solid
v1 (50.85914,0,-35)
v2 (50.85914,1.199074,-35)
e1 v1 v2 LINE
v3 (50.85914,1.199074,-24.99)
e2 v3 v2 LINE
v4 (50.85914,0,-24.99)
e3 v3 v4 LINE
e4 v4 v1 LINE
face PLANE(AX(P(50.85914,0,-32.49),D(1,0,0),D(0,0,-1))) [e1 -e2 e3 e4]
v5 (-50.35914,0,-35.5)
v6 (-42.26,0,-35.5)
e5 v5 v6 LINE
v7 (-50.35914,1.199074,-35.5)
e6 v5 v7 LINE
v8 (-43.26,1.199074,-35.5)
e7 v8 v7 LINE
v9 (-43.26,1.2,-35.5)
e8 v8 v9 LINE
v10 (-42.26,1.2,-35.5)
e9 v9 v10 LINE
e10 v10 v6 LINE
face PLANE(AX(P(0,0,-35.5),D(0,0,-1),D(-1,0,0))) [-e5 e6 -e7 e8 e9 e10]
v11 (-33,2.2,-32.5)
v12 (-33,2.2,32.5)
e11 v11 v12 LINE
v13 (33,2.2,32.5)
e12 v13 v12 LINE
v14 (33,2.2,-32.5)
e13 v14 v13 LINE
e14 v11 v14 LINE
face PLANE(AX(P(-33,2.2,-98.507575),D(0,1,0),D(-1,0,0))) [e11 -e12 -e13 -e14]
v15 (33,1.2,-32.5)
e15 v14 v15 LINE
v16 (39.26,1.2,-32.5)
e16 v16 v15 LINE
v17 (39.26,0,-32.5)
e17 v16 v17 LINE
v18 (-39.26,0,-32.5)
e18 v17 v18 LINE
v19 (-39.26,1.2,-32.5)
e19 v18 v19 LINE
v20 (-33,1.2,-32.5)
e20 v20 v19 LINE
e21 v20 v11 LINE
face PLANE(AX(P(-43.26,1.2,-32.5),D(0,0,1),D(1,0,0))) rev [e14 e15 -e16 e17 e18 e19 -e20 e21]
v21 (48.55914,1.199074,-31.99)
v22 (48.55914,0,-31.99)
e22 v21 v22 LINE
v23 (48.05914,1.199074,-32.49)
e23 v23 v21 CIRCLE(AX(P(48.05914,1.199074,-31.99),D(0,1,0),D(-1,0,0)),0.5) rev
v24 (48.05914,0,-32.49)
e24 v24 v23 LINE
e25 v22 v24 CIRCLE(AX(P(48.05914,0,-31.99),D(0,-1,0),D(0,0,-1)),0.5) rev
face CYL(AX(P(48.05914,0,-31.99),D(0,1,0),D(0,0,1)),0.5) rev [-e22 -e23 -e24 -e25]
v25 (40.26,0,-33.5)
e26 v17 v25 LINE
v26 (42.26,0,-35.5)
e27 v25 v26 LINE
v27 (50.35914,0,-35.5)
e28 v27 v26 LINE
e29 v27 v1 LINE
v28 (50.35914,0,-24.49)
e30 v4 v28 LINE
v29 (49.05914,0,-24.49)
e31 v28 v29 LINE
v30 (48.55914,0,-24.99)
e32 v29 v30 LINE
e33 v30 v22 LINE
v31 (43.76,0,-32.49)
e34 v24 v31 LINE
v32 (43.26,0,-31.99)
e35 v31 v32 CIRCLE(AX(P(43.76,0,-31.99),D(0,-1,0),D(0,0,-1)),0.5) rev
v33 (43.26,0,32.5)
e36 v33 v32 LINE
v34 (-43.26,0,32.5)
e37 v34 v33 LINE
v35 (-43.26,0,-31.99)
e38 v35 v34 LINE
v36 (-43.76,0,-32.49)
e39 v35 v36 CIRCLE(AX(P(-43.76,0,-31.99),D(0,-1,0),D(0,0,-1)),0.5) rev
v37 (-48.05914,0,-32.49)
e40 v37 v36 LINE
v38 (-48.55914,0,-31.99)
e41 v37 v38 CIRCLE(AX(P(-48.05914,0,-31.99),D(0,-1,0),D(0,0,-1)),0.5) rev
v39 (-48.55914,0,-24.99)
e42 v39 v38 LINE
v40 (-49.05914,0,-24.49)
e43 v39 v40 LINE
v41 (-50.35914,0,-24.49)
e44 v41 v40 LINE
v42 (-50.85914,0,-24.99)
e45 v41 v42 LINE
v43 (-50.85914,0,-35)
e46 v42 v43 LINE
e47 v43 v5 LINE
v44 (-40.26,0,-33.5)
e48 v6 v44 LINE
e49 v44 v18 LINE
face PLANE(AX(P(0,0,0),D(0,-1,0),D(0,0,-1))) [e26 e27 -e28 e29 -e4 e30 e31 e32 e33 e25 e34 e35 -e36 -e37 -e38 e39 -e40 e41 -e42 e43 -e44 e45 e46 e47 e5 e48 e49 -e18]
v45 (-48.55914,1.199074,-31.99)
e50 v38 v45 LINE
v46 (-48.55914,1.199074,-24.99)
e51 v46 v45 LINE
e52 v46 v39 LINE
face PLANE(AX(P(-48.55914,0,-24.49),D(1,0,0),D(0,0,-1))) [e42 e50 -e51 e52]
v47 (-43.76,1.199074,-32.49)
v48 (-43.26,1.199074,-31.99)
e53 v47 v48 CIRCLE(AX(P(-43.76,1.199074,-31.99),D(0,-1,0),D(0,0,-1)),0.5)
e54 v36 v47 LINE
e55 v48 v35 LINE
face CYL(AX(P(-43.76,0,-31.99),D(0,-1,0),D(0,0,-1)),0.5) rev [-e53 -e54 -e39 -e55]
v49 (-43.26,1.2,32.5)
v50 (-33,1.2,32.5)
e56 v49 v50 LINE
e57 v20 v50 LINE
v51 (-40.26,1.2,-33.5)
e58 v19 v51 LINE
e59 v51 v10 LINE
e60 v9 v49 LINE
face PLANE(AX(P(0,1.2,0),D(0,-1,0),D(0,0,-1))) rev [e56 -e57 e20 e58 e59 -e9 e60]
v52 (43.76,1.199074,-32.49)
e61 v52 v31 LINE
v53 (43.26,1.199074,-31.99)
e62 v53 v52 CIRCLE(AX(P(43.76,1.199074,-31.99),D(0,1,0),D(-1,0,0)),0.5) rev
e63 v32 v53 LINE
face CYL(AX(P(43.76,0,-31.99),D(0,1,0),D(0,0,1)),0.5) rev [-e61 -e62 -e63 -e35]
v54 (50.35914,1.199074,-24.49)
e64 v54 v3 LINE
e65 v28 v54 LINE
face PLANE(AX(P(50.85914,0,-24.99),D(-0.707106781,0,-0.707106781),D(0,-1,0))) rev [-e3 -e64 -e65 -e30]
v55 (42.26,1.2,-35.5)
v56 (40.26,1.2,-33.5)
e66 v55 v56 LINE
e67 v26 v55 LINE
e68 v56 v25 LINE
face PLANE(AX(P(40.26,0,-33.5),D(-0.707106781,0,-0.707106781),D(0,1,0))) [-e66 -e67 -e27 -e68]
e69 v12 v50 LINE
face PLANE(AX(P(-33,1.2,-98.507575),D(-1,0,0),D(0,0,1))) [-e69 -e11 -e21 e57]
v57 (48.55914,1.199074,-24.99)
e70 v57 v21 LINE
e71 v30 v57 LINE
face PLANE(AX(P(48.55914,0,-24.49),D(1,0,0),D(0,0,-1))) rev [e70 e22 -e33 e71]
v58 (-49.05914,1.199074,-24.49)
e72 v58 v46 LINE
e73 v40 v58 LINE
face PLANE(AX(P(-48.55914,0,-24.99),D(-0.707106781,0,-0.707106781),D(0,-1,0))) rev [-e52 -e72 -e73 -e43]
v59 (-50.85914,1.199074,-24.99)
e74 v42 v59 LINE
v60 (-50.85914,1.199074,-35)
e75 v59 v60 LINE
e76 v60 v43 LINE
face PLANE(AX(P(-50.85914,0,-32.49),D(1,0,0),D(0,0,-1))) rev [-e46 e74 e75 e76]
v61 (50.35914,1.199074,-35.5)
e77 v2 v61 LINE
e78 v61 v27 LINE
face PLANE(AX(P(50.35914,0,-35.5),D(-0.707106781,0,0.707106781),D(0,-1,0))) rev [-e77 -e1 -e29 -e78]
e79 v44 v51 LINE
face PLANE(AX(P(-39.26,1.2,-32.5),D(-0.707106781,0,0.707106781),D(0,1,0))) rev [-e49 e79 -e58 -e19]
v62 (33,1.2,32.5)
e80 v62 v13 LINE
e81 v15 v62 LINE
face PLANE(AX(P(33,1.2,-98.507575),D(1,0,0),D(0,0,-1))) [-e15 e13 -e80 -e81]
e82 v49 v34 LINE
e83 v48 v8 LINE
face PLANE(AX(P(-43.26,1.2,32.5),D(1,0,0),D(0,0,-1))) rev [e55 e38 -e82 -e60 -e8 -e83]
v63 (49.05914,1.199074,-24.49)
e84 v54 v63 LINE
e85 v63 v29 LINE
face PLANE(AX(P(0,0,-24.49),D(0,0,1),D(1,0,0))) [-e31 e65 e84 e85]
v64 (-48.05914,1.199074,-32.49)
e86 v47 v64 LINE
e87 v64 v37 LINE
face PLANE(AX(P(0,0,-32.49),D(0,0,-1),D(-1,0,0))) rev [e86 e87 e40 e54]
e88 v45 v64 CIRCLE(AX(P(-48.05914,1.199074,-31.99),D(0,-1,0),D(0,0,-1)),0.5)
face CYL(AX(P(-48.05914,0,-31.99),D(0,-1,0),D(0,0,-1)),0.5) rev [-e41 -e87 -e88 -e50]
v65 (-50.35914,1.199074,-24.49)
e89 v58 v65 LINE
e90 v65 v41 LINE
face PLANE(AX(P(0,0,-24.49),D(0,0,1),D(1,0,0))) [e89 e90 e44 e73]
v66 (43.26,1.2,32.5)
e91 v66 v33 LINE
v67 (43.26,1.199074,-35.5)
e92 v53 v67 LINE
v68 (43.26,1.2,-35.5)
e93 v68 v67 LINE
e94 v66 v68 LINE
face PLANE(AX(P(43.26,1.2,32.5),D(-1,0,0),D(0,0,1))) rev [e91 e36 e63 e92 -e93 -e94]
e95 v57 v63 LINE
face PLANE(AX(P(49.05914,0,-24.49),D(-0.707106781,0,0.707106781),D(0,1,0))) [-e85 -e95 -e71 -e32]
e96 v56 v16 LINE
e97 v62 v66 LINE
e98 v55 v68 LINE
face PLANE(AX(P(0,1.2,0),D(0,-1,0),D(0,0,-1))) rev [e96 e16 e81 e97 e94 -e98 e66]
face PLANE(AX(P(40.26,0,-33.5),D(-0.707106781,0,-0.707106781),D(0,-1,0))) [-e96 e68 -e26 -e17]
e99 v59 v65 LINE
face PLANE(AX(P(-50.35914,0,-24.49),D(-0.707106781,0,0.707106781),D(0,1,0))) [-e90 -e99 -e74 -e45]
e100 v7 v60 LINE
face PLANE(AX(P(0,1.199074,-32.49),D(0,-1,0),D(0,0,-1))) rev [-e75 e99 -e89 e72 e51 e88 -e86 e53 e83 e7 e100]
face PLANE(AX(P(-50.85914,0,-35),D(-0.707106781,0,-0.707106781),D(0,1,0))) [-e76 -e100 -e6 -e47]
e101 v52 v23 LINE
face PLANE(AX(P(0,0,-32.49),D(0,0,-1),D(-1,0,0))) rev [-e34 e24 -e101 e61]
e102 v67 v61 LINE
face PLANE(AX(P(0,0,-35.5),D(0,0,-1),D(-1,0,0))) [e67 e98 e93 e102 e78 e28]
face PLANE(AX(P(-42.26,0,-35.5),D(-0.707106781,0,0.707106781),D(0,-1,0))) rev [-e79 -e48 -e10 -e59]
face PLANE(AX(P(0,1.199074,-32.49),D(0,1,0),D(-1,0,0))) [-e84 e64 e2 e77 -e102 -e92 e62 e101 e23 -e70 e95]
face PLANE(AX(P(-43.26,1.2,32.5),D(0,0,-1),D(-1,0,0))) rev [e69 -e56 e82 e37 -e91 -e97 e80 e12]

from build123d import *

# Parameters (mm, degrees)
SKETCH1_W                = 86.52
SKETCH1_H                = 65
BOSS_EXTRUDE1_DEPTH      = 1.2
SKETCH2_W                = 66
SKETCH2_H                = 1
BOSS_EXTRUDE2_DEPTH      = 65
BOSS_EXTRUDE5_DEPTH      = 3
BOSS_EXTRUDE5_DEPTH_BACK = 0.01
CHAMFER1_SIZE            = 2
CHAMFER2_SIZE            = 2
CHAMFER3_SIZE            = 1
SKETCH5_W                = 2.3
SKETCH5_H                = 1.199074312
BOSS_EXTRUDE7_DEPTH      = 8
CHAMFER5_SIZE            = 0.5
FILLET3_R                = 0.5


with BuildPart() as part:
    # Sketch1 → Boss-Extrude1 (new body)
    with BuildSketch(Plane(origin=(0, 0, 0), x_dir=(1, 0, 0), z_dir=(0, 1, 0))):
        Rectangle(SKETCH1_W, SKETCH1_H)
    extrude(amount=BOSS_EXTRUDE1_DEPTH)

    # Sketch2 → Boss-Extrude2 (add)
    with BuildSketch(Plane.XY.offset(32.5)):
        with Locations((0, 1.7)):
            Rectangle(SKETCH2_W, SKETCH2_H)
    extrude(amount=-BOSS_EXTRUDE2_DEPTH)

    # Sketch3 → Boss-Extrude5 (add, two sides: drawn at the far end of the back side and taken through both)
    with BuildSketch(Plane(origin=(0, 0, -32.5), x_dir=(-1, 0, 0), z_dir=(0, 0, -1)).offset(-BOSS_EXTRUDE5_DEPTH_BACK)):
        Polygon((-43.26, 1.2), (-43.26, 1.199074312), (-50.859139548, 1.199074312), (-50.859139548, 0), (-40.26, 0), (-40.26, 1.2), align=None)
        Polygon((40.26, 1.2), (40.26, 0), (50.859139548, 0), (50.859139548, 1.199074312), (43.26, 1.199074312), (43.26, 1.2), align=None)
    extrude(amount=BOSS_EXTRUDE5_DEPTH + BOSS_EXTRUDE5_DEPTH_BACK)

    # Chamfer1
    chamfer1_edges = [part.edges().sort_by_distance(p)[0] for p in [
        (40.26, 0.6, -35.5),
    ]]
    chamfer(chamfer1_edges, length=CHAMFER1_SIZE)

    # Chamfer2
    chamfer2_edges = [part.edges().sort_by_distance(p)[0] for p in [
        (-40.26, 0.6, -35.5),
    ]]
    chamfer(chamfer2_edges, length=CHAMFER2_SIZE)

    # Chamfer3
    chamfer3_edges = [part.edges().sort_by_distance(p)[0] for p in [
        (-40.26, 0.6, -32.5),
        (40.26, 0.6, -32.5),
    ]]
    chamfer(chamfer3_edges, length=CHAMFER3_SIZE - 0.0001)  # a hair under: the kernel refuses the full size

    # Sketch5 → Boss-Extrude7 (add)
    with BuildSketch(Plane.XY.offset(-32.49)):
        with Locations((-49.709139548, 0.599537156)):
            Rectangle(SKETCH5_W, SKETCH5_H)
        with Locations((49.709139548, 0.599537156)):
            Rectangle(SKETCH5_W, SKETCH5_H)
    extrude(amount=BOSS_EXTRUDE7_DEPTH)

    # Chamfer5
    chamfer5_edges = [part.edges().sort_by_distance(p)[0] for p in [
        (-48.559139548, 0.599537156, -24.49),
        (-50.859139548, 0.599537156, -24.49),
        (50.859139548, 0.599537156, -24.49),
        (48.559139548, 0.599537156, -24.49),
        (-50.859139548, 0.599537156, -35.5),
        (50.859139548, 0.599537156, -35.5),
    ]]
    chamfer(chamfer5_edges, length=CHAMFER5_SIZE)

    # Fillet3
    fillet3_edges = [part.edges().sort_by_distance(p)[0] for p in [
        (-48.559139548, 0.599537156, -32.49),
        (48.559139548, 0.599537156, -32.49),
        (-43.26, 0.599537156, -32.49),
        (43.26, 0.599537156, -32.49),
    ]]
    fillet(fillet3_edges, radius=FILLET3_R)


solid = part.part
